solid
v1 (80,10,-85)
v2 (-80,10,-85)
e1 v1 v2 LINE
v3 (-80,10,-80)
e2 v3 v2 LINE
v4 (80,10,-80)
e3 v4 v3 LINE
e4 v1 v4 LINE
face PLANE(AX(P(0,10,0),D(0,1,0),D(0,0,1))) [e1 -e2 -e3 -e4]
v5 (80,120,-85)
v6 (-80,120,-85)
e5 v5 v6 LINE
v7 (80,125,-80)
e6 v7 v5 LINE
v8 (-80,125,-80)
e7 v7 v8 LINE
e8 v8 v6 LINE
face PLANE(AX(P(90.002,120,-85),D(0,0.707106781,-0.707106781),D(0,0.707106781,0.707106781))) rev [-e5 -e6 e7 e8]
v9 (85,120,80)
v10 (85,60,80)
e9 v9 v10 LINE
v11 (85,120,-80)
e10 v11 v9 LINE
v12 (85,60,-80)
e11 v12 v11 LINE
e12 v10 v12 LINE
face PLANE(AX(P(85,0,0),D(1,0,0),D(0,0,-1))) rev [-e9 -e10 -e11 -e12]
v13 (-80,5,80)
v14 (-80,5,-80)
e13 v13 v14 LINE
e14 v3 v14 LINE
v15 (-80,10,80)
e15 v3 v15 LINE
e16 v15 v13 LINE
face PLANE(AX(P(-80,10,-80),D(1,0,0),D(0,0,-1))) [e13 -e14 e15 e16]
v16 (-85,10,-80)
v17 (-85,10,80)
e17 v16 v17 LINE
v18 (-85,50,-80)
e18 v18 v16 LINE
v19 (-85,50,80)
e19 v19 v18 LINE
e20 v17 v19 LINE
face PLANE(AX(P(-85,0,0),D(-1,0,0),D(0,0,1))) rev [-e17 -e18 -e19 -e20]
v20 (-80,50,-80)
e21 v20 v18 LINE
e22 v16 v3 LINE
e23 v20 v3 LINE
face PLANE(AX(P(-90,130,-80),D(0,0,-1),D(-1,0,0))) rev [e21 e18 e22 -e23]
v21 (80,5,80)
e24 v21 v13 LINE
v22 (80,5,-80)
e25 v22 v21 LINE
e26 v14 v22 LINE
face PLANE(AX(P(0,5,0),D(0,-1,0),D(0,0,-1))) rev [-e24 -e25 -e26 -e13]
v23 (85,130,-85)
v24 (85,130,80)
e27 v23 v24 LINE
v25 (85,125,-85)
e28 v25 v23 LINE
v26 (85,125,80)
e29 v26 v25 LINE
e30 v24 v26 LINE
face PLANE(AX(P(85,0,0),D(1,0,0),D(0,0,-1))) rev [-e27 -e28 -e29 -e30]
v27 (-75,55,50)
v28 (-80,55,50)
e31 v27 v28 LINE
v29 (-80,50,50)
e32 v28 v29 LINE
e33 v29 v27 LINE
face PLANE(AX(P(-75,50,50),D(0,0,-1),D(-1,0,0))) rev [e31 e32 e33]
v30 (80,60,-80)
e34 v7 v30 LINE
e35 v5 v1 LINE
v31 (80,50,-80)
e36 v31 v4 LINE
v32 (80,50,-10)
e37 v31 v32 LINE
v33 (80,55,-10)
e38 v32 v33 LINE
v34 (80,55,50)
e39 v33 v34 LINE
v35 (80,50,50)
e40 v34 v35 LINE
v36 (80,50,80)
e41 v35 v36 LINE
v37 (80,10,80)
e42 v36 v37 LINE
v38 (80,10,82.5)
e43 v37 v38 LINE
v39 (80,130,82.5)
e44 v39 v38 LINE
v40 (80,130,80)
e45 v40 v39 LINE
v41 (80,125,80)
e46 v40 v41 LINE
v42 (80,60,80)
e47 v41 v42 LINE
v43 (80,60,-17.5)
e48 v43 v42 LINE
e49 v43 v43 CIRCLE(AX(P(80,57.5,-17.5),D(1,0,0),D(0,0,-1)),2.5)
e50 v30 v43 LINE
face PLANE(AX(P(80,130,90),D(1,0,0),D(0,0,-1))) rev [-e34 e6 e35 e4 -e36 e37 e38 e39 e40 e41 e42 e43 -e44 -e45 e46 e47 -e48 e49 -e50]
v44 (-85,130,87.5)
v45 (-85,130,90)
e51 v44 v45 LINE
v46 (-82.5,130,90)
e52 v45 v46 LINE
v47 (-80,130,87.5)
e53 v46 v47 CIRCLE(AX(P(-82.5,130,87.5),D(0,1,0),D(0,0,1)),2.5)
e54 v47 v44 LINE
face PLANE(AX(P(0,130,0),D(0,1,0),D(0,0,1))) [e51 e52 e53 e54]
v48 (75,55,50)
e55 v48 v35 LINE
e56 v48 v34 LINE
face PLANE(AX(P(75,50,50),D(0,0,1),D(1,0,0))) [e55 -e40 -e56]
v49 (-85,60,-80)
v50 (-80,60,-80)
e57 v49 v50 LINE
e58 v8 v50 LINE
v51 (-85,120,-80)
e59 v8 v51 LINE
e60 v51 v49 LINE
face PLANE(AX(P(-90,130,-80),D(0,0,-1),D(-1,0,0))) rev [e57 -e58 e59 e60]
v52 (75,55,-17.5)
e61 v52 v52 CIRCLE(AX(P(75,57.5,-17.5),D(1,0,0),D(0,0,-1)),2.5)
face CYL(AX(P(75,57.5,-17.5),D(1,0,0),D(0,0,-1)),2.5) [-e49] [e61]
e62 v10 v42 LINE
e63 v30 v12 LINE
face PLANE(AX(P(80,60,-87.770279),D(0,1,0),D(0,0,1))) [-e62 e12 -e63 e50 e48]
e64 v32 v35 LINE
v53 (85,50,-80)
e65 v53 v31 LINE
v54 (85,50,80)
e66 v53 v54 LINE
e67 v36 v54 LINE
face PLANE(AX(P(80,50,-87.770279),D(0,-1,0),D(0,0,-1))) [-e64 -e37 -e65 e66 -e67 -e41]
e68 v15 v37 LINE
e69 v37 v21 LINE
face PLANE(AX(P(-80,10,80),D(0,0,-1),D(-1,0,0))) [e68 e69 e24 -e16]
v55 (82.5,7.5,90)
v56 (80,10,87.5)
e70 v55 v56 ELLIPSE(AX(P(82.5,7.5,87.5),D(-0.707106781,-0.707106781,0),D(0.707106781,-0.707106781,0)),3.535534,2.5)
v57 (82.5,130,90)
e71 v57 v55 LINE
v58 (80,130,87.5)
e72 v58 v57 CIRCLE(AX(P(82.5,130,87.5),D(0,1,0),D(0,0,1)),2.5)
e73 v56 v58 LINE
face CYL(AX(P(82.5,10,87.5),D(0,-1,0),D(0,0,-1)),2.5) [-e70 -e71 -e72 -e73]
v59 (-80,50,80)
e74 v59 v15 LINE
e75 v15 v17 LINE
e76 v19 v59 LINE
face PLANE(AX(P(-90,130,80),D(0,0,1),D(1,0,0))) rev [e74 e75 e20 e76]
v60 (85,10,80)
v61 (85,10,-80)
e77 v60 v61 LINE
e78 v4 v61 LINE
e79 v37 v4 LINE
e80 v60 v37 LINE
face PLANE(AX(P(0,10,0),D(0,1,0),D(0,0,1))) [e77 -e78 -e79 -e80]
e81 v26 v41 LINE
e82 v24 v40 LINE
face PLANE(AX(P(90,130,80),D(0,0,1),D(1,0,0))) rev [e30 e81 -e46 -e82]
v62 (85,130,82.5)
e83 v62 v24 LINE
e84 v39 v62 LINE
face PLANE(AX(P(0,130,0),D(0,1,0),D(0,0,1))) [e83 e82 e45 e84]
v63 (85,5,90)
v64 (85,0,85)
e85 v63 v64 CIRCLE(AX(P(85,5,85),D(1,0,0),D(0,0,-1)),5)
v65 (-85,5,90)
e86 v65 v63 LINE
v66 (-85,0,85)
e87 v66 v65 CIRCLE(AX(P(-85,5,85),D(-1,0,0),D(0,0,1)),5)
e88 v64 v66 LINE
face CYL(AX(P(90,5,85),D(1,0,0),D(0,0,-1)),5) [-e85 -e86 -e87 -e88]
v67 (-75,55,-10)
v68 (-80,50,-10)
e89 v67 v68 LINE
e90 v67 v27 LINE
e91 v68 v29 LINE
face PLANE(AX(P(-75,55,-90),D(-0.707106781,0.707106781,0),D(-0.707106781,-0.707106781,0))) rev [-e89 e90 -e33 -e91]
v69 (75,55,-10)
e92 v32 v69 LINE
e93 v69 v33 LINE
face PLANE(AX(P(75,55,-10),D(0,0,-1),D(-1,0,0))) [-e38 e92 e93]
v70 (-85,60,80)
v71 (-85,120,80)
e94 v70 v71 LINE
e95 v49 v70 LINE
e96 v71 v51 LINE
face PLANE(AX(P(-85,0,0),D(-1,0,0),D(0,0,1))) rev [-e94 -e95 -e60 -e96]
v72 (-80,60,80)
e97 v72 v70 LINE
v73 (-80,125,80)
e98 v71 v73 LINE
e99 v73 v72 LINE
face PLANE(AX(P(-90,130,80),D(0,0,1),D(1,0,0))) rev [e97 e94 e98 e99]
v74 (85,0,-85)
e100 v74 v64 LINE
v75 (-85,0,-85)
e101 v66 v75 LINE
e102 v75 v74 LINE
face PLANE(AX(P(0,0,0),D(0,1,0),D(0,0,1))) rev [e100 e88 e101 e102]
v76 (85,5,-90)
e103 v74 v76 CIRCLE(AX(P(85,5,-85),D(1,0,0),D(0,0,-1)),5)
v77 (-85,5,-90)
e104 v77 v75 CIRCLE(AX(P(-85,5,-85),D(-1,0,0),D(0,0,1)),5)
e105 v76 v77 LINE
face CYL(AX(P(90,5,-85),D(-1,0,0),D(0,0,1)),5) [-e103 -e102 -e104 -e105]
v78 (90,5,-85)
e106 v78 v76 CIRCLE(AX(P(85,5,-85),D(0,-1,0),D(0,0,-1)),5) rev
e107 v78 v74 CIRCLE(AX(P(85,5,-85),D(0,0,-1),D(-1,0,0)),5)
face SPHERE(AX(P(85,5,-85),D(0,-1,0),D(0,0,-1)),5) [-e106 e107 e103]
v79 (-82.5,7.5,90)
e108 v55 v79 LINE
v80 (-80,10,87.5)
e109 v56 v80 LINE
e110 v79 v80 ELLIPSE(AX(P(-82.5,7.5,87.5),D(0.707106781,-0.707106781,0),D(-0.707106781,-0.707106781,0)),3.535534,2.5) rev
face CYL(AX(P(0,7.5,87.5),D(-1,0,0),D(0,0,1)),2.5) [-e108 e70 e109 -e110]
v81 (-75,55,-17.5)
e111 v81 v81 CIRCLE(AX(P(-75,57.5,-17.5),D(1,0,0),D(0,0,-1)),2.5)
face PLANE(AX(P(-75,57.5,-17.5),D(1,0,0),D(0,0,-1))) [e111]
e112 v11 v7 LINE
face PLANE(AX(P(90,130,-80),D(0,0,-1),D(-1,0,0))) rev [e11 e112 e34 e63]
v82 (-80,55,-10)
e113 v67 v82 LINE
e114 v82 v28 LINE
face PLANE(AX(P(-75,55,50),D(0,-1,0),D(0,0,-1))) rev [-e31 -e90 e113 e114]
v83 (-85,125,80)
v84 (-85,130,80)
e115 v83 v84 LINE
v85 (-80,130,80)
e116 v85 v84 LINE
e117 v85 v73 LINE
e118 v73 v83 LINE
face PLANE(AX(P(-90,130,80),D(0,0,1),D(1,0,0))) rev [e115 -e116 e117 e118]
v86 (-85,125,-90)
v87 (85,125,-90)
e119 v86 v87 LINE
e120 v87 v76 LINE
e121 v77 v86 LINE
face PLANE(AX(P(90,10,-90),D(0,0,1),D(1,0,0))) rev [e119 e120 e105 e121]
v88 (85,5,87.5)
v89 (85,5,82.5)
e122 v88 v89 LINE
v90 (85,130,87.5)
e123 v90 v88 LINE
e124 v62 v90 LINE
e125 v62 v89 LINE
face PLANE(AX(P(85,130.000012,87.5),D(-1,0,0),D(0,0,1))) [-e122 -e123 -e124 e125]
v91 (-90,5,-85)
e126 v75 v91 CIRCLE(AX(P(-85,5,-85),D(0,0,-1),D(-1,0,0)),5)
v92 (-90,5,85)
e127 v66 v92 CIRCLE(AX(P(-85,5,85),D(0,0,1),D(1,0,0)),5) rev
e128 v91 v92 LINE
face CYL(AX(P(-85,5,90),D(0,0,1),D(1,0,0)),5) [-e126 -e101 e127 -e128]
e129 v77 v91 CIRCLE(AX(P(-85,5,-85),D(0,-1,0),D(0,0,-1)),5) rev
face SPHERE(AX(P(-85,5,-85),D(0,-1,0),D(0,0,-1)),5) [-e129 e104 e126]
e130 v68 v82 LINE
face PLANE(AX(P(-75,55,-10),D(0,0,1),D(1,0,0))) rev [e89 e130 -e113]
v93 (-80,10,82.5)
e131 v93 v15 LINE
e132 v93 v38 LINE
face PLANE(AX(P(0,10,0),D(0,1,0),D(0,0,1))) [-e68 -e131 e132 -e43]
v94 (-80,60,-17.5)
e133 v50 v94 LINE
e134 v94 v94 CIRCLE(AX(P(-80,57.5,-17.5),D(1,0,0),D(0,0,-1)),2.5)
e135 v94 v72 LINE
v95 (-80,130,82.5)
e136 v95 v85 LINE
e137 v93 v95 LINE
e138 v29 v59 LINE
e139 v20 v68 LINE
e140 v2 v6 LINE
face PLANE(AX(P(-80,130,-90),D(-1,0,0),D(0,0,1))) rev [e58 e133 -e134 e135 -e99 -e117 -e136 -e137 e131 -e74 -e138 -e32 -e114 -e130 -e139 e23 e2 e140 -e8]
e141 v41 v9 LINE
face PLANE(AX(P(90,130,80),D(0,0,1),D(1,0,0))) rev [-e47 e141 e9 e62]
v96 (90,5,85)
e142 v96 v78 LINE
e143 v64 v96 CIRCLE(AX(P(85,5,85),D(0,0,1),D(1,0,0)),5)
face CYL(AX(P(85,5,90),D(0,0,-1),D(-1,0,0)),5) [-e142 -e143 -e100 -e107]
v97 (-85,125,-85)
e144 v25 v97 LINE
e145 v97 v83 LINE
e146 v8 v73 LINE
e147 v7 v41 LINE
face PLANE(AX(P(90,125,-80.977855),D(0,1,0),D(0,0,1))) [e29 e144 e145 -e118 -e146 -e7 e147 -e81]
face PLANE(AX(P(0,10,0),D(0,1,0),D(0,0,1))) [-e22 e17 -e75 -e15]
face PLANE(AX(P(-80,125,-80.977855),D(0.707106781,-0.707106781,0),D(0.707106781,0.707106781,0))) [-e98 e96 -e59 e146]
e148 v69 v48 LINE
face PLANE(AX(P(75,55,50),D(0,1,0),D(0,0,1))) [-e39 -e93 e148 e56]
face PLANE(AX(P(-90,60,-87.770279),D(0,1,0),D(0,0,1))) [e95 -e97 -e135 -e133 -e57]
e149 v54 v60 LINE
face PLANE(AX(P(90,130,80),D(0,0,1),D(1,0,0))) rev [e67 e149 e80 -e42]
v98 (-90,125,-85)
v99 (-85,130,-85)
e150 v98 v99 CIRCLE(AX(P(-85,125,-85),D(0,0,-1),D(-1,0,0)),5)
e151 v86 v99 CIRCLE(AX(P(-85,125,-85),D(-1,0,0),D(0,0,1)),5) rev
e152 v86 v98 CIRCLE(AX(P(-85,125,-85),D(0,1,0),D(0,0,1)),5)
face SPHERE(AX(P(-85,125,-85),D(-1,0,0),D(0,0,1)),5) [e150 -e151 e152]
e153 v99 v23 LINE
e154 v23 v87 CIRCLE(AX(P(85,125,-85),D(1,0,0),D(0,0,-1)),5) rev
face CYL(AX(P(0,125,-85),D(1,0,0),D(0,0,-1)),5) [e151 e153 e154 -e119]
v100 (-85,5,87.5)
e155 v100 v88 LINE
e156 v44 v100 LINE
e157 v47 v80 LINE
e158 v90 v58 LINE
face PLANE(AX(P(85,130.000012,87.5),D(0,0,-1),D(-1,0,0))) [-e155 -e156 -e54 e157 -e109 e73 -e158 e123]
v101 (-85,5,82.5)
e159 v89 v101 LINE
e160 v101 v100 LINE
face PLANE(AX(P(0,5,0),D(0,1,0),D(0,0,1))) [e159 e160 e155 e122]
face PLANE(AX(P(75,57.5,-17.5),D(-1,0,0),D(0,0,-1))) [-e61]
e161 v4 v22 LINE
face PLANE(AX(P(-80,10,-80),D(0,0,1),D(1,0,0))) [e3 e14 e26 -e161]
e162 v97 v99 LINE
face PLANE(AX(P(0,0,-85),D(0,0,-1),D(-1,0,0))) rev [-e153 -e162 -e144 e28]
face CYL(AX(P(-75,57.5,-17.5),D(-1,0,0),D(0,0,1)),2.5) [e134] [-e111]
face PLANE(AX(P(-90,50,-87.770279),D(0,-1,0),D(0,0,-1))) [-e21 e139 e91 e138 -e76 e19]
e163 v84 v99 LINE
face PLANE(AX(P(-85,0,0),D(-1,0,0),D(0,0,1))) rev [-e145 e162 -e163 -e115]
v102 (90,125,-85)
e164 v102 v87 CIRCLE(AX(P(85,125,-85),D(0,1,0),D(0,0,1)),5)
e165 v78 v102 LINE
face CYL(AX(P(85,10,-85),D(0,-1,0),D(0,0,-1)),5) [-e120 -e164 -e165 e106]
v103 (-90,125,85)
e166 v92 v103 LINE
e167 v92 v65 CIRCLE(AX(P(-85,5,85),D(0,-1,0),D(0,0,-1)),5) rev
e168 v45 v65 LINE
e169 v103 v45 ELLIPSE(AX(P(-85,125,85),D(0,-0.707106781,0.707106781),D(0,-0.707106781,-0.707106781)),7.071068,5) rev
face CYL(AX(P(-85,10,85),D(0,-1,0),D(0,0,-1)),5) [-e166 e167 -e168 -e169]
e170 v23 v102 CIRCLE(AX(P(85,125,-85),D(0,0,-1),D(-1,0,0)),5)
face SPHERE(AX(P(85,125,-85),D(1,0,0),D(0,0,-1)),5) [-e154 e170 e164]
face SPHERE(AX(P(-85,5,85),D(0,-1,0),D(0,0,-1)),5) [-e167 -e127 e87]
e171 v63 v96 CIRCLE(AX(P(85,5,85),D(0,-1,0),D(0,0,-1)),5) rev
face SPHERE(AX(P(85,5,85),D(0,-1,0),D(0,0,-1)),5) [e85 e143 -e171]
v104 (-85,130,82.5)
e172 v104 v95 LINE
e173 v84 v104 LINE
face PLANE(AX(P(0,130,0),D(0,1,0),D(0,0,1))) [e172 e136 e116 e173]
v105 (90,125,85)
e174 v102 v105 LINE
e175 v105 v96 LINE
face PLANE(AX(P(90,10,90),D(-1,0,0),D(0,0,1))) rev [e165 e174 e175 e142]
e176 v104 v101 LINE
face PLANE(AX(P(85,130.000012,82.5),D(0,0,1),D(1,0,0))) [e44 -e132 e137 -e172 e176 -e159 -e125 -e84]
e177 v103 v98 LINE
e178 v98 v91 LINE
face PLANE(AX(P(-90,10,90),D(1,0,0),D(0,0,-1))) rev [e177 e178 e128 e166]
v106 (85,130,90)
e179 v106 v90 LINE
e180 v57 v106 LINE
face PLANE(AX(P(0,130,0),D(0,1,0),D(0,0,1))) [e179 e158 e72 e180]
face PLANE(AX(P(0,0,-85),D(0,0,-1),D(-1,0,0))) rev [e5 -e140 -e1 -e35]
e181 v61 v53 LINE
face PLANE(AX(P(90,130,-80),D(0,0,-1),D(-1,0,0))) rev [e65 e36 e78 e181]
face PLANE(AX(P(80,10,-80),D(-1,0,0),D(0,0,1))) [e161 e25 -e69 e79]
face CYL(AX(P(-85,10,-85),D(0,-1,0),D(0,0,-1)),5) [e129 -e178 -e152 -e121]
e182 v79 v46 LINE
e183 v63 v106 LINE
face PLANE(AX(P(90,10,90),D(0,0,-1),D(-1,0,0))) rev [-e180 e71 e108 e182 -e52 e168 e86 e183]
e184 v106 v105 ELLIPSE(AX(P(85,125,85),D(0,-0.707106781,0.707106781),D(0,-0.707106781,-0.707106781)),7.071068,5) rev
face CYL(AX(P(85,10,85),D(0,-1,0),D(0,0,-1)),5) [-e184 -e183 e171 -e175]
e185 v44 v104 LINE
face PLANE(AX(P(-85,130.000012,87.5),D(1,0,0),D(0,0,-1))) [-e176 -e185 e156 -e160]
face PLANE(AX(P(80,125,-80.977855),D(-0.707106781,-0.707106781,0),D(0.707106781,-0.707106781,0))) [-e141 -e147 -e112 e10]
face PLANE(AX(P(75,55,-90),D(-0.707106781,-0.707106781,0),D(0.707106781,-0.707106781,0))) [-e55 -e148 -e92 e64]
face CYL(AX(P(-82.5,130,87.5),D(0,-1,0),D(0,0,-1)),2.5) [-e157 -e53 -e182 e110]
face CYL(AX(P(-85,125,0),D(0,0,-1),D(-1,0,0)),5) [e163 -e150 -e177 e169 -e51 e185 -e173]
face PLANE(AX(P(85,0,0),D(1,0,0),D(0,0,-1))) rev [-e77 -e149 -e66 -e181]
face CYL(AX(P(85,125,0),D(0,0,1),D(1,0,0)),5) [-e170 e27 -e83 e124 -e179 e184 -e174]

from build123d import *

# Parameters (mm, degrees)
SKETCH5_W               = 180
SKETCH5_H               = 180
SKETCH5_W_2             = 160
SKETCH5_H_2             = 160
BOSS_EXTRUDE5_DEPTH     = 10
SKETCH6_W               = 10
SKETCH6_H               = 10
BOSS_EXTRUDE6_DEPTH     = 120
SKETCH7_W               = 10
SKETCH7_H               = 10
BOSS_EXTRUDE7_DEPTH     = 177.77027879
SKETCH10_R              = 2.5
SKETCH10_W              = 60
SKETCH10_H              = 5
BOSS_EXTRUDE9_DEPTH     = 5
CUT_EXTRUDE1_DEPTH      = 212.187120819
SKETCH12_W              = 160
SKETCH12_H              = 160
BOSS_EXTRUDE10_DEPTH    = 5
SKETCH14_W              = 160
SKETCH14_H              = 120
BOSS_EXTRUDE12_DEPTH    = 5
BOSS_EXTRUDE13_DEPTH    = 170.97785486
SKETCH16_W              = 160
SKETCH16_H              = 120
BOSS_EXTRUDE14_DEPTH    = 5
SKETCH17_W              = 160
SKETCH17_H              = 120
BOSS_EXTRUDE15_DEPTH    = 5
CUT_EXTRUDE2_DEPTH      = 182.934053987
CUT_EXTRUDE2_DEPTH_BACK = 125
SKETCH18_W              = 170
SKETCH18_H              = 5
BOSS_EXTRUDE16_REACH    = 234.164
SKETCH20_W              = 5
SKETCH20_H              = 5
CUT_EXTRUDE4_DEPTH      = 5
FILLET4_R               = 5
FILLET6_R               = 2.5
SKETCH9_W               = 160
SKETCH9_H               = 160
BOSS_EXTRUDE8_DEPTH     = 5


with BuildPart() as part:
    # Sketch5 → Boss-Extrude5 (new body)
    with BuildSketch(Plane(origin=(0, 0, 0), x_dir=(1, 0, 0), z_dir=(0, 1, 0))):
        Rectangle(SKETCH5_W, SKETCH5_H)
        Rectangle(SKETCH5_W_2, SKETCH5_H_2, mode=Mode.SUBTRACT)
    extrude(amount=BOSS_EXTRUDE5_DEPTH)

    # Sketch6 → Boss-Extrude6 (add)
    with BuildSketch(Plane(origin=(0, 10, 0), x_dir=(1, 0, 0), z_dir=(0, 1, 0))):
        with Locations((85, -85)):
            Rectangle(SKETCH6_W, SKETCH6_H)
        with Locations((85, 85)):
            Rectangle(SKETCH6_W, SKETCH6_H)
        with Locations((-85, 85)):
            Rectangle(SKETCH6_W, SKETCH6_H)
        with Locations((-85, -85)):
            Rectangle(SKETCH6_W, SKETCH6_H)
    extrude(amount=BOSS_EXTRUDE6_DEPTH)

    # Sketch7 → Boss-Extrude7 (add)
    with BuildSketch(Plane.XY.offset(90)):
        with Locations((85, 55)):
            Rectangle(SKETCH7_W, SKETCH7_H)
        with Locations((-85, 55)):
            Rectangle(SKETCH7_W, SKETCH7_H)
    extrude(amount=-BOSS_EXTRUDE7_DEPTH)

    # Sketch10 → Boss-Extrude9 (add)
    with BuildSketch(Plane(origin=(-80, 0, 0), x_dir=(0, 0, -1), z_dir=(1, 0, 0))):
        with Locations(Location((17.5, 57.5, 0), (0, 0, 90))):
            Circle(SKETCH10_R)
        with Locations((-20, 52.5)):
            Rectangle(SKETCH10_W, SKETCH10_H)
    boss_extrude9 = extrude(amount=BOSS_EXTRUDE9_DEPTH)

    # Sketch11 → Cut-Extrude1 (cut, symmetric)
    with BuildSketch(Plane.XY.offset(50)):
        Polygon((-75, 55), (-80, 50), (-75, 50), align=None)
    cut_extrude1 = extrude(amount=CUT_EXTRUDE1_DEPTH, both=True, mode=Mode.SUBTRACT)

    # Mirror1: Boss-Extrude9, Cut-Extrude1 across plane
    add(boss_extrude9.mirror(Plane(origin=(0, 0, 0), x_dir=(0, 0, 1), z_dir=(1, 0, 0))))
    add(cut_extrude1.mirror(Plane(origin=(0, 0, 0), x_dir=(0, 0, 1), z_dir=(1, 0, 0))), mode=Mode.SUBTRACT)

    # Sketch12 → Boss-Extrude10 (add)
    with BuildSketch(Plane.XZ):
        Rectangle(SKETCH12_W, SKETCH12_H)
    extrude(amount=-BOSS_EXTRUDE10_DEPTH)

    # Sketch14 → Boss-Extrude12 (add)
    with BuildSketch(Plane(origin=(0, 0, -90), x_dir=(-1, 0, 0), z_dir=(0, 0, -1))):
        with Locations((0, 70)):
            Rectangle(SKETCH14_W, SKETCH14_H)
    extrude(amount=-BOSS_EXTRUDE12_DEPTH)

    # Sketch15 → Boss-Extrude13 (add)
    with BuildSketch(Plane.XY.offset(90)):
        Polygon((-90, 125), (-80, 125), (-90, 115), align=None)
        Polygon((90, 115), (90, 125), (80, 125), align=None)
    extrude(amount=-BOSS_EXTRUDE13_DEPTH)

    # Sketch16 → Boss-Extrude14 (add)
    with BuildSketch(Plane(origin=(90, 0, 0), x_dir=(0, 0, -1), z_dir=(1, 0, 0))):
        with Locations((0, 70)):
            Rectangle(SKETCH16_W, SKETCH16_H)
    extrude(amount=-BOSS_EXTRUDE14_DEPTH)

    # Sketch17 → Boss-Extrude15 (add)
    with BuildSketch(Plane.ZY.offset(90)):
        with Locations((0, 70)):
            Rectangle(SKETCH17_W, SKETCH17_H)
    extrude(amount=-BOSS_EXTRUDE15_DEPTH)

    # Sketch18 → Cut-Extrude2 (cut, two sides: drawn at the far end of the back side and taken through both)
    with BuildSketch(Plane(origin=(0, 130, 0), x_dir=(1, 0, 0), z_dir=(0, 1, 0)).offset(-CUT_EXTRUDE2_DEPTH_BACK)):
        with Locations((0, -85)):
            Rectangle(SKETCH18_W, SKETCH18_H)
    extrude(amount=CUT_EXTRUDE2_DEPTH + CUT_EXTRUDE2_DEPTH_BACK, mode=Mode.SUBTRACT)

    # Sketch19 → Boss-Extrude16 (add, up to next)
    with BuildSketch(Plane(origin=(-80, 0, 0), x_dir=(0, 0, -1), z_dir=(1, 0, 0)), mode=Mode.PRIVATE) as boss_extrude16_sk1:
        Polygon((80, 125), (85, 125), (85, 120), align=None)
    boss_extrude16_tool1 = extrude(boss_extrude16_sk1.sketch, amount=BOSS_EXTRUDE16_REACH, mode=Mode.PRIVATE) - part.part
    add(boss_extrude16_tool1.solids().sort_by_distance((-80, 123.333333, -83.333333))[0])

    # Sketch20 → Cut-Extrude4 (cut)
    with BuildSketch(Plane(origin=(0, 130, 0), x_dir=(1, 0, 0), z_dir=(0, 1, 0))):
        with Locations((-82.5, 82.5)):
            Rectangle(SKETCH20_W, SKETCH20_H)
        with Locations((82.5, 82.5)):
            Rectangle(SKETCH20_W, SKETCH20_H)
    extrude(amount=-CUT_EXTRUDE4_DEPTH, mode=Mode.SUBTRACT)

    # Fillet4
    fillet4_edges = [part.edges().sort_by_distance(p)[0] for p in [
        (90, 130, 0),
        (0, 130, -90),
        (0, 0, -90),
        (-90, 130, 0),
        (90, 0, 0),
        (0, 0, 90),
        (-90, 0, 0),
        (-90, 65, -90),
        (90, 65, -90),
        (90, 65, 90),
        (-90, 65, 90),
    ]]
    fillet(fillet4_edges, radius=FILLET4_R - 0.0001)  # a hair under: the kernel refuses the full size

    # Fillet6
    fillet6_edges = [part.edges().sort_by_distance(p)[0] for p in [
        (-80, 70, 90),
        (80, 70, 90),
        (0, 10, 90),
    ]]
    fillet(fillet6_edges, radius=FILLET6_R - 0.0001)  # a hair under: the kernel refuses the full size

    # Sketch9 → Boss-Extrude8 (add)
    with BuildSketch(Plane(origin=(0, 0, 0), x_dir=(-1, 0, 0), z_dir=(0, -1, 0))):
        Rectangle(SKETCH9_W, SKETCH9_H)
    extrude(amount=-BOSS_EXTRUDE8_DEPTH)


solid = part.part
